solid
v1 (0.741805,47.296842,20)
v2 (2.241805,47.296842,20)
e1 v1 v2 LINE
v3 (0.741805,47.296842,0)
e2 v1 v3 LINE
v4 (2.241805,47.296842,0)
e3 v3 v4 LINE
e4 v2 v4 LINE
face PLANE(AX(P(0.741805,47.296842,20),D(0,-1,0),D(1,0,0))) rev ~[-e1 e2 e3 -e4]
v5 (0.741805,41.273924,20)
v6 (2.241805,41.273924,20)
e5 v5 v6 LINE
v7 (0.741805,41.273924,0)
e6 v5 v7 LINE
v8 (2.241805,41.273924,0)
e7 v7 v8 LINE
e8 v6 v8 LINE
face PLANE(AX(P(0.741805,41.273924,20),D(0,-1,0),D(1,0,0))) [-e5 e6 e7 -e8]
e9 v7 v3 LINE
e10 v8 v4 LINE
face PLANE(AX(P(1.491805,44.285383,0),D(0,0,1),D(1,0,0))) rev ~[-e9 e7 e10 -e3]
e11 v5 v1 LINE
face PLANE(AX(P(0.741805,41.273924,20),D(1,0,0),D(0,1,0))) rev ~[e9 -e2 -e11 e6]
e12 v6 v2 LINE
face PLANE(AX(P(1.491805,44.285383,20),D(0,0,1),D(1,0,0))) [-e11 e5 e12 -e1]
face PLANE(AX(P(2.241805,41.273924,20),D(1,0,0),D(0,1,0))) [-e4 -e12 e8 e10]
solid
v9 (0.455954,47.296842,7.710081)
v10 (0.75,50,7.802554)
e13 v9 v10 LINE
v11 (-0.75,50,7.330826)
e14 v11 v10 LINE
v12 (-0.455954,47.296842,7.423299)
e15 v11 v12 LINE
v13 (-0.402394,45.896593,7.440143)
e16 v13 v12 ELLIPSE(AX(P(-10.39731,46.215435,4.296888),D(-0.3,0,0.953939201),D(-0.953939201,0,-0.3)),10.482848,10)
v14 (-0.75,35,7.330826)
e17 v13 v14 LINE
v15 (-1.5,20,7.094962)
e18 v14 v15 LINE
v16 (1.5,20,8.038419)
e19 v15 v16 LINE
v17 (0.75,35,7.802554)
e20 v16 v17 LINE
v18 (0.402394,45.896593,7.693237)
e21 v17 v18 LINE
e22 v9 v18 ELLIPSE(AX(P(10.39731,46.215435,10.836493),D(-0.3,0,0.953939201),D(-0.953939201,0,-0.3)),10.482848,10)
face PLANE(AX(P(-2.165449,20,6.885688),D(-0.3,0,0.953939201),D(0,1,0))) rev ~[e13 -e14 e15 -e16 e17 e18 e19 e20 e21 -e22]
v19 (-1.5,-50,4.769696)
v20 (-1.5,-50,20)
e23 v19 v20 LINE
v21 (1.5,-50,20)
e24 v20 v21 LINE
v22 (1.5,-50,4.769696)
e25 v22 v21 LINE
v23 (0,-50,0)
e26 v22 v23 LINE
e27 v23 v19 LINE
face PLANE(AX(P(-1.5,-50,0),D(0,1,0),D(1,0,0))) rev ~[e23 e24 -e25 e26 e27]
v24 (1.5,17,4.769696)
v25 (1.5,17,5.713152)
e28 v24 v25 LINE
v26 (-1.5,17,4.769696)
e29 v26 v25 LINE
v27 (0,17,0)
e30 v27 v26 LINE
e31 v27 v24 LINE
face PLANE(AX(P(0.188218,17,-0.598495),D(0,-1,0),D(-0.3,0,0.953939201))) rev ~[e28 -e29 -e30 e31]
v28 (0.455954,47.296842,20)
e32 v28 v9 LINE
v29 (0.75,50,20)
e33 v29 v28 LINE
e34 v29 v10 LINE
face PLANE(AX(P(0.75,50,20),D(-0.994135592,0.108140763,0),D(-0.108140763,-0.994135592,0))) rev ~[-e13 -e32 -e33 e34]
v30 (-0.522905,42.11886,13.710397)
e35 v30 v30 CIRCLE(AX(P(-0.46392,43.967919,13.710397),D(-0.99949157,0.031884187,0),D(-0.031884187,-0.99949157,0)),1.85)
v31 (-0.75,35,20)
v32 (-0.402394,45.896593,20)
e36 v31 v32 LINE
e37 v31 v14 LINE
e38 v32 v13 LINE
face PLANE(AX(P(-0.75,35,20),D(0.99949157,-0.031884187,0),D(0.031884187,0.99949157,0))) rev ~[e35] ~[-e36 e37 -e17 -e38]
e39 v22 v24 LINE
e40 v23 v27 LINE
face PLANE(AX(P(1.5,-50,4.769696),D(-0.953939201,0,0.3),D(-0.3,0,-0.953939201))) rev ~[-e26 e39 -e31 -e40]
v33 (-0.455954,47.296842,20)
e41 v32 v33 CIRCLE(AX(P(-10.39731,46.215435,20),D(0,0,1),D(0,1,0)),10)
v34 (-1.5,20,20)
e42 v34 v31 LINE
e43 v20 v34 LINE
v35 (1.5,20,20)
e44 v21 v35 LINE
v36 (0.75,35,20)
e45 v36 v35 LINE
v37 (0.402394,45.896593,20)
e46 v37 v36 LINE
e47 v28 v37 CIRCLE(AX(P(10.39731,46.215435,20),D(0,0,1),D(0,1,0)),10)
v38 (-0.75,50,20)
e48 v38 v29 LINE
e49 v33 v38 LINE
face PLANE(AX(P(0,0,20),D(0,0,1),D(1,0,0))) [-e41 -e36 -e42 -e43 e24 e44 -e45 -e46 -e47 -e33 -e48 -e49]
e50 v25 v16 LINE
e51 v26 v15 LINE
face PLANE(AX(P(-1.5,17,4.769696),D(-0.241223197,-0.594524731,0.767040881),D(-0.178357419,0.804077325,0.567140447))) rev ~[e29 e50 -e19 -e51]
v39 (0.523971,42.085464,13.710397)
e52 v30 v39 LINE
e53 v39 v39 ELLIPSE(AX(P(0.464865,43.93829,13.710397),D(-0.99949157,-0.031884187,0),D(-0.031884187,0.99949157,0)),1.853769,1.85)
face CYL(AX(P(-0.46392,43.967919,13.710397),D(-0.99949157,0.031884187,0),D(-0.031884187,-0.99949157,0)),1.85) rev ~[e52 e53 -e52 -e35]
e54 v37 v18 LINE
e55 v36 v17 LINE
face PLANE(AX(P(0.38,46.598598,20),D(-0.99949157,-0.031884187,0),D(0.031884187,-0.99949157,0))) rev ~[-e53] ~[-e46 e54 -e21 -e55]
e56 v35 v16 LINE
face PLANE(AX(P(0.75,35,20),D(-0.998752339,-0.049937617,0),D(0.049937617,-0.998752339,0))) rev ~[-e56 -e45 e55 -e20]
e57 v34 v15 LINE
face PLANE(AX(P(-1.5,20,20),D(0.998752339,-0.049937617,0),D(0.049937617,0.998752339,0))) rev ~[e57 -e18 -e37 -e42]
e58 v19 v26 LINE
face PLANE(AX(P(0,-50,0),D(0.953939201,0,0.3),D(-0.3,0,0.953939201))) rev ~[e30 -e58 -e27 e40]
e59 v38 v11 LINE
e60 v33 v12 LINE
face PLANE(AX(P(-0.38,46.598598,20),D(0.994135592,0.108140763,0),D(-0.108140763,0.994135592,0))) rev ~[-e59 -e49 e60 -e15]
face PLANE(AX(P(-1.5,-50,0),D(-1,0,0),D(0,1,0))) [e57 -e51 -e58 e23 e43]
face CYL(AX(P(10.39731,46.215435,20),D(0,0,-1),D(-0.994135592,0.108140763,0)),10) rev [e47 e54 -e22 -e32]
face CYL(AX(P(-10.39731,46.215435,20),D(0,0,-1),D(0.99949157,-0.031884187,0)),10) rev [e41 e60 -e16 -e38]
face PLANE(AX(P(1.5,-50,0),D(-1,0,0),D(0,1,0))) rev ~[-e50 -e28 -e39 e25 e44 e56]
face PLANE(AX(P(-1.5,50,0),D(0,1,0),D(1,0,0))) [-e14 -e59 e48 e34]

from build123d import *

# Parameters (mm, degrees)
F0_W      = 3
F0_H      = 100
F1_DEPTH  = 20
F2_W      = 1
F2_H      = 4.7696960071
F3_DEPTH  = 100.001
F5_DEPTH  = 20.001
F7_DEPTH  = 7.4319088021
F8_R      = 10
F9_R      = 1.85
F10_DEPTH = 4.9600119411
F11_W     = 1.5
F11_H     = 6.0229186812
F12_DEPTH = 20


# Not quite as in the source:
# - the program builds the solid bodies; features that only make, move or delete a surface that nothing else refers to are left out


with BuildPart() as f1:
    # F0 (on Top) → F1 (new body)
    with BuildSketch(Plane.XY):
        Rectangle(F0_W, F0_H)
    extrude(amount=F1_DEPTH)

    # F2 (on face) → F3 (cut, through all)
    with BuildSketch(Plane.XZ.offset(50)):
        with Locations((-2, 2.3848480035)):
            Rectangle(F2_W, F2_H)
        Polygon((-1.5, 0), (0, 0), (-1.5, 4.7696960071), align=None)
        Polygon((1.5, 4.7696960071), (0, 0), (1.5, 0), align=None)
        with Locations((2, 2.3848480035)):
            Rectangle(F2_W, F2_H)
    extrude(amount=-F3_DEPTH, mode=Mode.SUBTRACT)

    # F4 (on face) → F5 (cut, through all)
    with BuildSketch(Plane.XY.offset(20)):
        Polygon((-1.62, 20), (-1.5, 20), (-0.75, 35), (-0.38, 46.598598361), (-0.75, 50), (-1.62, 50), align=None)
        Polygon((1.62, 20), (1.62, 50), (0.75, 50), (0.38, 46.598598361), (0.75, 35), (1.5, 20), align=None)
    extrude(amount=-F5_DEPTH, mode=Mode.SUBTRACT)

    # F6 (on face) → F7 (cut, through all)
    with BuildSketch(Plane(origin=(0, 0, 0), x_dir=(0, -1, 0), z_dir=(-0.9539392014, 0, -0.3))):
        Polygon((-20, 7.2181625292), (-50.5925305188, 7.2181625292), (-50.5925305188, -0.6273934268), (-17, -0.6273934268), (-17, 5), align=None)
    extrude(amount=-F7_DEPTH, mode=Mode.SUBTRACT)

    # F8
    f8_edges = [f1.edges().sort_by_distance(p)[0] for p in [
        (-0.75, 35, 13.665413),
        (0.75, 35, 13.901277),
        (0.38, 46.598598, 13.843097),
        (-0.38, 46.598598, 13.723593),
    ]]
    fillet(f8_edges, radius=F8_R)

    # F9 (on face) → F10 (cut, through all)
    with BuildSketch(Plane(origin=(-1.8646167189, 0.0594820309, 0), x_dir=(-0.0318841872, -0.9994915701, 0), z_dir=(-0.9994915701, 0.0318841872, 0))):
        with Locations((-43.930772692, 13.7103971598)):
            Circle(F9_R)
    extrude(amount=-F10_DEPTH, mode=Mode.SUBTRACT)


with BuildPart() as f12:
    # F11 (on face) → F12 (new body)
    with BuildSketch(Plane.XY.offset(20)):
        with Locations((1.491804529, 44.2853828522)):
            Rectangle(F11_W, F11_H)
    extrude(amount=-F12_DEPTH)


solid = Compound([f1.part, f12.part])
